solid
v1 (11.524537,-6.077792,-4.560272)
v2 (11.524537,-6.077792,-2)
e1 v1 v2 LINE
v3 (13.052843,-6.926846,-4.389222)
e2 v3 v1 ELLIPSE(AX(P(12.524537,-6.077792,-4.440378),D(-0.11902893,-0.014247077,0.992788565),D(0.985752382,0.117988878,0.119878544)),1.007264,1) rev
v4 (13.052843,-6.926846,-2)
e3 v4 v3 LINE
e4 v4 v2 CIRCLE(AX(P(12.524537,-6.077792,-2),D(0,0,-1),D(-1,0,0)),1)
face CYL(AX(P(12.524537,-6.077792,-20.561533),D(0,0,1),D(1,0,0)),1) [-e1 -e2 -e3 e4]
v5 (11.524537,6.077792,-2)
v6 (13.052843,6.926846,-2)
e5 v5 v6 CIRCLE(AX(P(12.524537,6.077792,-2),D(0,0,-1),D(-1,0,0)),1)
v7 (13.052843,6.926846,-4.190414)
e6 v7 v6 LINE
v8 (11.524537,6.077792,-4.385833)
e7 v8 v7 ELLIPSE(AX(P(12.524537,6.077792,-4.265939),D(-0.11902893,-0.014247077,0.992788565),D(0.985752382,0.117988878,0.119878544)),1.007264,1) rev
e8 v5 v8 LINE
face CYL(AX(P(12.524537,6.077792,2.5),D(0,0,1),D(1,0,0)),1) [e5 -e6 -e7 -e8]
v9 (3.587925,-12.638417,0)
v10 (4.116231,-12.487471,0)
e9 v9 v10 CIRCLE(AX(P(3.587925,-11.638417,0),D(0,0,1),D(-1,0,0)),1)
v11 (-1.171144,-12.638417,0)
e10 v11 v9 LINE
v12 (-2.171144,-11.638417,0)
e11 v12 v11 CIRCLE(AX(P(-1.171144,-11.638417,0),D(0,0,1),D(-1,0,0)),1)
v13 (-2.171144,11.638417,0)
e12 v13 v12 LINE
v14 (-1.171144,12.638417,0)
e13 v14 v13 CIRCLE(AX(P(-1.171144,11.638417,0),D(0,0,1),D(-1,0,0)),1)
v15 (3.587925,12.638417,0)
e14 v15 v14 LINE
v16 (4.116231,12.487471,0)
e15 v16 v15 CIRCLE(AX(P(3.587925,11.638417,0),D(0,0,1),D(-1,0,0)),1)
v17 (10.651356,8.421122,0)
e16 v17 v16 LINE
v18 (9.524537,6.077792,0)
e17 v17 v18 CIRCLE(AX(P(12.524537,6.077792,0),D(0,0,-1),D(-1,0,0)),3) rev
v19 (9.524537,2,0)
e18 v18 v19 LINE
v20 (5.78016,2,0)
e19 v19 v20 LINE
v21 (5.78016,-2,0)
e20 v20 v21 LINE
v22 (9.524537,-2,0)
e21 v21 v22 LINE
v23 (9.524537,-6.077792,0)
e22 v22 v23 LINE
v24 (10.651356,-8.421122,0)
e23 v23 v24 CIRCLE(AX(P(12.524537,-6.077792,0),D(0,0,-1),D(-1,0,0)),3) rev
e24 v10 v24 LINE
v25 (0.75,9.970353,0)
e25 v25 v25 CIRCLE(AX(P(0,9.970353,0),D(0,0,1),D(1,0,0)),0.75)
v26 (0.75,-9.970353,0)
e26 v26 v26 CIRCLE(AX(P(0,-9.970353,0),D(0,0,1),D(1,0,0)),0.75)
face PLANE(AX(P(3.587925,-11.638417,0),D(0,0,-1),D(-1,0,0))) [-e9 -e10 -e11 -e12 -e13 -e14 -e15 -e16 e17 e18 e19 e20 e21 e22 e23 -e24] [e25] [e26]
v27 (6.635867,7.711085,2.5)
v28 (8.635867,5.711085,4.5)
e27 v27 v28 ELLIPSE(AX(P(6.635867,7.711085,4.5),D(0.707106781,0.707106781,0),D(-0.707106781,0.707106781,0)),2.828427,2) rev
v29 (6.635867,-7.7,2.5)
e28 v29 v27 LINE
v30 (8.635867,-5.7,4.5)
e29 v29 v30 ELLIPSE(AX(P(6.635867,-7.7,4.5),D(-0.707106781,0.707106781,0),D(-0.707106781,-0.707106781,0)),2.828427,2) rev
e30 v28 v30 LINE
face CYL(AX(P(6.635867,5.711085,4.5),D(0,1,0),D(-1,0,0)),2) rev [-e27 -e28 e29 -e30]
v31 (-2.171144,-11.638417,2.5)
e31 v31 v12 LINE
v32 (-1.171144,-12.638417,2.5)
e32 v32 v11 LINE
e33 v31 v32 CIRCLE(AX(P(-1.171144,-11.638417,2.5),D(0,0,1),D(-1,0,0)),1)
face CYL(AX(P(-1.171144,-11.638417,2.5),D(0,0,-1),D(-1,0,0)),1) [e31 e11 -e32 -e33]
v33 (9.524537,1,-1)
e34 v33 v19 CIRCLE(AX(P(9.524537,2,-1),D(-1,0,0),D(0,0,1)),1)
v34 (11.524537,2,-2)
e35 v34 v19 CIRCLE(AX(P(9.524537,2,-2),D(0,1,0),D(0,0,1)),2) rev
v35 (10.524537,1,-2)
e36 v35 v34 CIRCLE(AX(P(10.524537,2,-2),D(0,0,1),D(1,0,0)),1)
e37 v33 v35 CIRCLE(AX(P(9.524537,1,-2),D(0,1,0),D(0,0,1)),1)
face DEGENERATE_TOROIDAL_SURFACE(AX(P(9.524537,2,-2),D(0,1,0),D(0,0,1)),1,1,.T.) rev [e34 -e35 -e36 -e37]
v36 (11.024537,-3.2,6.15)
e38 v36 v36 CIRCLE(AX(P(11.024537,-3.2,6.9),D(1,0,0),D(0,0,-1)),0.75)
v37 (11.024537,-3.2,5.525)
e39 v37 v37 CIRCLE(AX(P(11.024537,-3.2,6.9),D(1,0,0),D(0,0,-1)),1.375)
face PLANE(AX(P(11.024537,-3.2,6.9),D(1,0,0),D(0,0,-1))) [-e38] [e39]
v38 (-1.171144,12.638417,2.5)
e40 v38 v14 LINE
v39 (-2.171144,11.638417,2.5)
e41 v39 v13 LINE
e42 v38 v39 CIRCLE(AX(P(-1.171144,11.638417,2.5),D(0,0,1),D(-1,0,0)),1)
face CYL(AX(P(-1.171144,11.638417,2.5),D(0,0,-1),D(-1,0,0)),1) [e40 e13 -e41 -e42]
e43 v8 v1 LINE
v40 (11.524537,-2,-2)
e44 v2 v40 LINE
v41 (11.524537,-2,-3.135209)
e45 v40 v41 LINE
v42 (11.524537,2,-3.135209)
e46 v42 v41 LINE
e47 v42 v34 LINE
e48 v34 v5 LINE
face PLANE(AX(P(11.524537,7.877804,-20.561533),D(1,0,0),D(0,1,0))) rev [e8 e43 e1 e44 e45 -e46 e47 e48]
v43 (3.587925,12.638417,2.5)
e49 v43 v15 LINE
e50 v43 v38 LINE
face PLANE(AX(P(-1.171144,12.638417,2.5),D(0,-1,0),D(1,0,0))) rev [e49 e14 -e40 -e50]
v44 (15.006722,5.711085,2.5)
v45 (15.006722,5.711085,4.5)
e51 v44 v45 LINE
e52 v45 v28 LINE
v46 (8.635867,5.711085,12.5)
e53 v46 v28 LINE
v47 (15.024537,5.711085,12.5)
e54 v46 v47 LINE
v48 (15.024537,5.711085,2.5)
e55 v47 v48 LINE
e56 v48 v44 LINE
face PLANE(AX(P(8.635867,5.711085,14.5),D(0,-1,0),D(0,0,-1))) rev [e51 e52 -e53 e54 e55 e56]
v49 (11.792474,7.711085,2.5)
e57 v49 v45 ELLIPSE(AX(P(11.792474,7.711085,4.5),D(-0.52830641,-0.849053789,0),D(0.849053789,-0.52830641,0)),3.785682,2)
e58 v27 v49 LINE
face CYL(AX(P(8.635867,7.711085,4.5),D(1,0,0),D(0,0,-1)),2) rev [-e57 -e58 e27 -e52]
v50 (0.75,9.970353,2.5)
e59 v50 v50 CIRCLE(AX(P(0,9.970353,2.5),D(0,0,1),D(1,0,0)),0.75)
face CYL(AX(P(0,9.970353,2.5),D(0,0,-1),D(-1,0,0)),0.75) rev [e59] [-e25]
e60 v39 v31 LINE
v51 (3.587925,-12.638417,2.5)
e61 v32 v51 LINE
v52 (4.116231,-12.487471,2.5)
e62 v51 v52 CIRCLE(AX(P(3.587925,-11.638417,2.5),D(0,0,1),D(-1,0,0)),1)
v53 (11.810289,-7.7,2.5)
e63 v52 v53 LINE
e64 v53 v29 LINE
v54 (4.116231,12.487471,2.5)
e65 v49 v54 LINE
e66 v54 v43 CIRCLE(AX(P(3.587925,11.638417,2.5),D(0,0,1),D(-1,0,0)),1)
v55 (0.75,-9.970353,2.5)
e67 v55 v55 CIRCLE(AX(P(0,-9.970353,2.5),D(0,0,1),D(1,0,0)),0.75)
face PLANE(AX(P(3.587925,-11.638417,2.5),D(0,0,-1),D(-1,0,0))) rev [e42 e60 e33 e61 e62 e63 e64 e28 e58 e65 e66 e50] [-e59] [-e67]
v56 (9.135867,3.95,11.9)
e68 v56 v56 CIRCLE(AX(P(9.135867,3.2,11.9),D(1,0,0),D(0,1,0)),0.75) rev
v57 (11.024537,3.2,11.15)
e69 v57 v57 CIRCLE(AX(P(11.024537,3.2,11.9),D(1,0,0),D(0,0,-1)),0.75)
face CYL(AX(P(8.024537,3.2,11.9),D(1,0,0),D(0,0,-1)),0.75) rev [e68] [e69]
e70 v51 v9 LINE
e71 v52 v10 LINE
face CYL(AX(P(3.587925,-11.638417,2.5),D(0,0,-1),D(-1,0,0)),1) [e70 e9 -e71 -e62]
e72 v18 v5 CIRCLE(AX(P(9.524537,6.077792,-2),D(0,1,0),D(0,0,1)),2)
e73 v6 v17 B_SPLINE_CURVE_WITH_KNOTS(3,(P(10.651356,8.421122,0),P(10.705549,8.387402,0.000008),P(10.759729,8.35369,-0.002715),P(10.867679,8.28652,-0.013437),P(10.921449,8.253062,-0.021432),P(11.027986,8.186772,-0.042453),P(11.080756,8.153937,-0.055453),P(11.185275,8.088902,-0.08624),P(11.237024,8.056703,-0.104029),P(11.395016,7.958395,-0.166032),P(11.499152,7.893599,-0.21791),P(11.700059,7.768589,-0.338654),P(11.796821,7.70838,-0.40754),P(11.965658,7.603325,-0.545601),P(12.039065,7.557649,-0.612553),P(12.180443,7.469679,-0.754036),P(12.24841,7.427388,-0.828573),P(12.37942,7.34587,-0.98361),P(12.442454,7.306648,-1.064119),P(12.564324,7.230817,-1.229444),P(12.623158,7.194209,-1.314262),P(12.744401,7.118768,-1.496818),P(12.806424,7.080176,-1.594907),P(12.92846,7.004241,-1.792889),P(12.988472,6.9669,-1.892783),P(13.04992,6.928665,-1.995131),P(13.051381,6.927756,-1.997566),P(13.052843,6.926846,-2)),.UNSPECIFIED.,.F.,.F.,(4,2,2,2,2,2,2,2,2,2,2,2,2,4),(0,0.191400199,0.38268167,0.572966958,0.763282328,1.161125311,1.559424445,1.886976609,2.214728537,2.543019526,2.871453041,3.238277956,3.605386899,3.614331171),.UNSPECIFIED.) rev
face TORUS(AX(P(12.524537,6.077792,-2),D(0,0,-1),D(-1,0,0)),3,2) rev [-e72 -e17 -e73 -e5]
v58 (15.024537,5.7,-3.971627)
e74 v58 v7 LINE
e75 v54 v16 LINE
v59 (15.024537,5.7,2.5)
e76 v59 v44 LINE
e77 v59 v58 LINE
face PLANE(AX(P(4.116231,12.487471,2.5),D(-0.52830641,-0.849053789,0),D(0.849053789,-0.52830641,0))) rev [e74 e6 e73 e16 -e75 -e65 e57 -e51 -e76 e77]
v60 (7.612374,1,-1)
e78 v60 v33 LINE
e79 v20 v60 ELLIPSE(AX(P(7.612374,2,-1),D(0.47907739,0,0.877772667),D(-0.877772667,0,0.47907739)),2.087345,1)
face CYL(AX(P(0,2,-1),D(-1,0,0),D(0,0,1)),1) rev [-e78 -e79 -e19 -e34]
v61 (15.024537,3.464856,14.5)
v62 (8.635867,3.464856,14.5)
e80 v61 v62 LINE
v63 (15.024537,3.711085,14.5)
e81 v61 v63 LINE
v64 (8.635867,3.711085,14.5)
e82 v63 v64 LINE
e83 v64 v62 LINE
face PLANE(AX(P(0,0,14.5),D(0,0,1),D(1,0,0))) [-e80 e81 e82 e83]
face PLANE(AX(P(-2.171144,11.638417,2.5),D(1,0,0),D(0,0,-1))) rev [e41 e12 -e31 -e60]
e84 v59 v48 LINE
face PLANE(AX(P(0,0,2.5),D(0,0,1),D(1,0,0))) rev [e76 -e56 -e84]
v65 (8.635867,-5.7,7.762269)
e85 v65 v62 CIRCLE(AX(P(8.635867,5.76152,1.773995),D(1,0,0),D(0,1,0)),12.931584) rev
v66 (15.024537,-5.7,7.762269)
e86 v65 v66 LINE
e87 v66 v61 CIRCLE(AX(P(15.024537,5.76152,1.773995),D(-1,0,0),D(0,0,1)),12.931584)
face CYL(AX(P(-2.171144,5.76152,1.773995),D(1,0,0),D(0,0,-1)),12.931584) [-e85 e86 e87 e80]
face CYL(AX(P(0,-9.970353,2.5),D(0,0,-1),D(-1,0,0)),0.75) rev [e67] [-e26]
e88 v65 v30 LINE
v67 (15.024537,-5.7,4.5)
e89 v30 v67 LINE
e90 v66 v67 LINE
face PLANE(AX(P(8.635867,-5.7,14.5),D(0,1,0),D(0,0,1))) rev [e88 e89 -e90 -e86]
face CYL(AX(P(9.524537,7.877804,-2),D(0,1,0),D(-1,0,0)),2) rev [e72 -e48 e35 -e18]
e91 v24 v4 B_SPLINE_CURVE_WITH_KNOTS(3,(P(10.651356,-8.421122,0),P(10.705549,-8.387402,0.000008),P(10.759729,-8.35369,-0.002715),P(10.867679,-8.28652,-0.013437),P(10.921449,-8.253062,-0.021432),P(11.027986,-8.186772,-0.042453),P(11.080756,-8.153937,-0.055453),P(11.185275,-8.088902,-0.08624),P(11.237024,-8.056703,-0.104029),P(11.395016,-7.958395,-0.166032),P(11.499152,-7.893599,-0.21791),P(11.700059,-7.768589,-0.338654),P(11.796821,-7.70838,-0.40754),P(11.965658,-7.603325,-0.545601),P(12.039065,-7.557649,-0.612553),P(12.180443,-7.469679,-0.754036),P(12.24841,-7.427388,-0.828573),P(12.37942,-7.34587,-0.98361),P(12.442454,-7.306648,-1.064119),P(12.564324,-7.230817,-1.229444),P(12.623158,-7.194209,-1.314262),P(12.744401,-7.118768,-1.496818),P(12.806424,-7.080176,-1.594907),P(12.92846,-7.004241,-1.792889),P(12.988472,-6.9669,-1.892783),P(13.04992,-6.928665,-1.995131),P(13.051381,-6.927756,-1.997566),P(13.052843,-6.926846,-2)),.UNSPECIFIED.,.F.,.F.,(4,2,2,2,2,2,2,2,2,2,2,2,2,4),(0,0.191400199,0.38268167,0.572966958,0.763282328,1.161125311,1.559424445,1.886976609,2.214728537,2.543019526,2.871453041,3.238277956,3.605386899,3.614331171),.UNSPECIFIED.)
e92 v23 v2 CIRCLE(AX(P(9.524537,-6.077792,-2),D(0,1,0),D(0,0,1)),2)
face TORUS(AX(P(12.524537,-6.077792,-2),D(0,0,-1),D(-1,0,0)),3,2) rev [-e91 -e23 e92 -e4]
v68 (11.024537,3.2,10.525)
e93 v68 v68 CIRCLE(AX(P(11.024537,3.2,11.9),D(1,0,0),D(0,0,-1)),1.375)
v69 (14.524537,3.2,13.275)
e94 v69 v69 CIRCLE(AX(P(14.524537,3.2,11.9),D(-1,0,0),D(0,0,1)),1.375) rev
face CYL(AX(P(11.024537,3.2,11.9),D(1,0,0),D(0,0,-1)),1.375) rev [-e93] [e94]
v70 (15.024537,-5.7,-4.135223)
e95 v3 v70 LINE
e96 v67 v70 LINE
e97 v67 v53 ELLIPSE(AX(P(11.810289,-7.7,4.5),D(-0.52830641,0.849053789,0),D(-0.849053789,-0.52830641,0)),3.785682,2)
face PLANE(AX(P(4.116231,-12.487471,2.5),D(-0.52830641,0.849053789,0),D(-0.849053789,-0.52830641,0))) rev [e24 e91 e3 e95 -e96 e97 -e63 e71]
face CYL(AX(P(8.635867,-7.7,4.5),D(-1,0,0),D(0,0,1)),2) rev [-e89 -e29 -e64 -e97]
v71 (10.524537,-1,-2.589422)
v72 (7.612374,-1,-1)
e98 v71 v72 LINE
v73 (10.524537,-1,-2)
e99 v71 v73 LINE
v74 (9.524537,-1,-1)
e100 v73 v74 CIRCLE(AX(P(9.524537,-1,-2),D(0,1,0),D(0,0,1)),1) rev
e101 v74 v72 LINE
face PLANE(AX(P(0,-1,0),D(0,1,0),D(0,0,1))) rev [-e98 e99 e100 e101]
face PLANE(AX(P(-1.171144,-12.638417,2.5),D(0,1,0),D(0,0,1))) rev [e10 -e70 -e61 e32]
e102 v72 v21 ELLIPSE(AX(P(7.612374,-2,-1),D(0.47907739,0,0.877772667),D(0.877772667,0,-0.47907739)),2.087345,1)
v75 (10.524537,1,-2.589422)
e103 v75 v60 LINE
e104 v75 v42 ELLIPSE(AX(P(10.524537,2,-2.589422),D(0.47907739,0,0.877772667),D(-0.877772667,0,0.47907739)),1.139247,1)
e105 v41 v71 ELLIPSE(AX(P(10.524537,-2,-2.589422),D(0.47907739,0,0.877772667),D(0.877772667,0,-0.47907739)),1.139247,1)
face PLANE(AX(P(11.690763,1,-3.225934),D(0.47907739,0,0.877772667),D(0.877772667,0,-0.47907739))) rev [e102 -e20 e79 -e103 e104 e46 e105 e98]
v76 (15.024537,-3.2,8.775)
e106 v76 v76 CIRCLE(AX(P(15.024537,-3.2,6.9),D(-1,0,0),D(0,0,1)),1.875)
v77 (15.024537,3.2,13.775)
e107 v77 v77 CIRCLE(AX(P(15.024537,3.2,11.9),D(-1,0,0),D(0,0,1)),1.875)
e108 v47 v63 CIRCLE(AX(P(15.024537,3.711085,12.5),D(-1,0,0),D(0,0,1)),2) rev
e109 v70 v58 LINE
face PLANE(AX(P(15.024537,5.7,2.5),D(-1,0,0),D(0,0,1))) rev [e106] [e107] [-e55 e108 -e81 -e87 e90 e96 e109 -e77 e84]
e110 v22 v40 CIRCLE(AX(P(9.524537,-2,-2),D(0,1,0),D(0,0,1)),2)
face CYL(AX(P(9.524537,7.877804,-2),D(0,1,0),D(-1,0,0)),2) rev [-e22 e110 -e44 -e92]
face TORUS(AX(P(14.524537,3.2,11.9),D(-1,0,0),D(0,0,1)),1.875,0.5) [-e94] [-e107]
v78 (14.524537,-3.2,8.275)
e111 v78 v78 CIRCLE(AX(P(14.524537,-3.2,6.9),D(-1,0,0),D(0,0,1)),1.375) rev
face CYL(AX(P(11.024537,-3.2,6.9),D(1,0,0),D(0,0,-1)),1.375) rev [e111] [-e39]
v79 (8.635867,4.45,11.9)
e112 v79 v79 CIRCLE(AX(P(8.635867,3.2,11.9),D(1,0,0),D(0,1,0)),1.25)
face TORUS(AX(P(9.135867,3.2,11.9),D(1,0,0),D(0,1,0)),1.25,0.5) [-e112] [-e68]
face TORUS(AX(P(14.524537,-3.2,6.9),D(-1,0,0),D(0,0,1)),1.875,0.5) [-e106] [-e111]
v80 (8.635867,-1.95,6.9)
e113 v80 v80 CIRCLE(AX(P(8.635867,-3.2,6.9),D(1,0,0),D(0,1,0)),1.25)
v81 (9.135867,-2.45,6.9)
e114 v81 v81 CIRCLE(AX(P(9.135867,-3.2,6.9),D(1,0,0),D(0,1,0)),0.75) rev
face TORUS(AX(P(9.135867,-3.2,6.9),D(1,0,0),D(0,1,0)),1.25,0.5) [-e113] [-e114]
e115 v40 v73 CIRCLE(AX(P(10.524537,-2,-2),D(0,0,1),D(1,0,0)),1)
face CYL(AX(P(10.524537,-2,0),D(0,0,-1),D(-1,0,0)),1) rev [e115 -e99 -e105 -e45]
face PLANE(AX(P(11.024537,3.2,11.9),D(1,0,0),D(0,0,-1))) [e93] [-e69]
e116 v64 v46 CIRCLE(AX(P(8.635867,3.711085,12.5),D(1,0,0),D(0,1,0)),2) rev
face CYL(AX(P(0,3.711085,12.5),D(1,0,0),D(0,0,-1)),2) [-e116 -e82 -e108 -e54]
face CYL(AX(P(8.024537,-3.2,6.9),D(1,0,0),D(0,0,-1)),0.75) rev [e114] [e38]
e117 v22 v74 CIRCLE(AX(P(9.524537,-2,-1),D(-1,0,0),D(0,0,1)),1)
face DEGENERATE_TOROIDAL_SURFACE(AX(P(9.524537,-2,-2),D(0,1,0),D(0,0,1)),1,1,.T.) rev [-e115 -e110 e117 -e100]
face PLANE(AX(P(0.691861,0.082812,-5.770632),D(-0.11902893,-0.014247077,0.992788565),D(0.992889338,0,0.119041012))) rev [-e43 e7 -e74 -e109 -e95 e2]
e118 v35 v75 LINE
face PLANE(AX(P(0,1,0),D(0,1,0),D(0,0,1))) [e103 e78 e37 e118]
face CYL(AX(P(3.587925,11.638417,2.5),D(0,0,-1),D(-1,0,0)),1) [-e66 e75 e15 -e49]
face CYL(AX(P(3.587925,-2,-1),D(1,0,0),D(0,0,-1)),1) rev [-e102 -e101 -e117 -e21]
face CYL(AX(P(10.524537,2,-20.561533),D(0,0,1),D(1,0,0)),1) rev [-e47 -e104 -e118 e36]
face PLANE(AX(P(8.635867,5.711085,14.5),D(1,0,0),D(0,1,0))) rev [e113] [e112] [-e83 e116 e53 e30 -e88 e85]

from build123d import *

# Parameters (mm, degrees)
SKETCH2_R           = 0.7500000000000004
BOSS_EXTRUDE1_DEPTH = 2.5
BOSS_EXTRUDE2_DEPTH = 12
CUT_EXTRUDE1_DEPTH  = 26.80060102058964
SKETCH6_R           = 1.3749999999999991
CUT_EXTRUDE2_DEPTH  = 4
SKETCH7_R           = 0.7500000000000003
CUT_EXTRUDE3_DEPTH  = 3
FILLET1_R           = 2
BOSS_EXTRUDE3_REACH = 26.407
FILLET2_R           = 1
FILLET3_R           = 2
FILLET4_R           = 0.5
FILLET5_R           = 2
BOSS_EXTRUDE4_DEPTH = 1
FILLET6_R           = 1


with BuildPart() as part:
    # Sketch2 → Boss-Extrude1 (new body)
    with BuildSketch(Plane.XY):
        with BuildLine():
            Line((4.116231300669973, -12.487470539218611), (15.02453653918129, -5.7))
            Line((15.02453653918129, -5.7), (15.02453653918129, 5.7))
            Line((15.02453653918129, 5.7), (4.116231300669971, 12.48747053921861))
            ThreePointArc((4.116231300669971, 12.48747053921861), (3.862648579708159, 12.599939965816992), (3.587924890573724, 12.638416749961875))
            Line((3.587924890573724, 12.638416749961875), (-1.1711441707508923, 12.638416749961877))
            ThreePointArc((-1.1711441707508923, 12.638416749961877), (-1.8782509519374466, 12.345523531148423), (-2.1711441707508996, 11.63841674996187))
            Line((-2.1711441707508996, 11.63841674996187), (-2.1711441707508996, -11.638416749961872))
            ThreePointArc((-2.1711441707508996, -11.638416749961872), (-1.8782509519374468, -12.345523531148427), (-1.1711441707508923, -12.638416749961879))
            Line((-1.1711441707508923, -12.638416749961879), (3.5879248905737255, -12.638416749961879))
            ThreePointArc((3.5879248905737255, -12.638416749961879), (3.862648579708161, -12.599939965816995), (4.116231300669973, -12.487470539218611))
        make_face()
        with Locations((0, -9.97035341926017)):
            Circle(SKETCH2_R, mode=Mode.SUBTRACT)
        with Locations((3.47e-15, 9.97035341926017)):
            Circle(SKETCH2_R, mode=Mode.SUBTRACT)
    extrude(amount=BOSS_EXTRUDE1_DEPTH)

    # Sketch3 → Boss-Extrude2 (add)
    with BuildSketch(Plane.XY.offset(2.5)):
        Polygon((8.635867339785385, 5.711084969162394), (15.02453653918129, 5.711084969162394), (15.02453653918129, -5.7), (8.635867339785387, -5.7), align=None)
    extrude(amount=BOSS_EXTRUDE2_DEPTH)

    # Sketch5 → Cut-Extrude1 (cut, through all)
    with BuildSketch(Plane(origin=(15.02453653918129, 0, 0), x_dir=(0, 0, -1), z_dir=(1, 0, 0))):
        with BuildLine():
            Line((-7.762268701086982, -5.7), (-14.5, -5.7))
            Line((-14.5, -5.7), (-14.5, 3.4648563911354757))
            ThreePointArc((-14.5, 3.4648563911354757), (-12.192953898035139, -1.8981901244151027), (-7.762268701086982, -5.7))
        make_face()
    extrude(amount=-CUT_EXTRUDE1_DEPTH, mode=Mode.SUBTRACT)

    # Sketch6 → Cut-Extrude2 (cut)
    with BuildSketch(Plane(origin=(15.02453653918129, 0, 0), x_dir=(0, 0, -1), z_dir=(1, 0, 0))):
        with Locations((-6.900000000000064, -3.2)):
            Circle(SKETCH6_R)
        with Locations((-11.900000000000077, 3.2)):
            Circle(SKETCH6_R)
    extrude(amount=-CUT_EXTRUDE2_DEPTH, mode=Mode.SUBTRACT)

    # Sketch7 → Cut-Extrude3 (cut)
    with BuildSketch(Plane(origin=(11.02453653918129, 0, 0), x_dir=(0, 0, -1), z_dir=(1, 0, 0))):
        with Locations((-11.900000000000077, 3.2)):
            Circle(SKETCH7_R)
        with Locations((-6.900000000000064, -3.2)):
            Circle(SKETCH7_R)
    extrude(amount=-CUT_EXTRUDE3_DEPTH, mode=Mode.SUBTRACT)

    # Fillet1
    fillet1_edges = [part.edges().sort_by_distance(p)[0] for p in [
        (11.821294480770684, 5.711084969162394, 2.5),
        (8.635867339785385, 0.00554248458119755, 2.5),
        (11.830201939483338, -5.7, 2.5),
    ]]
    fillet(fillet1_edges, radius=FILLET1_R)

    # Boss-Extrude3: up to this plane
    boss_extrude3_end = Plane(origin=(0.6918614114138348, 0.08281182310567678, -5.770631561455755), z_dir=(-0.11902892958542202, -0.014247076796988894, 0.99278856496461))
    # Sketch8 → Boss-Extrude3 (add, up to the surface)
    with BuildSketch(Plane(origin=(0, 0, 0), x_dir=(-1, 0, 0), z_dir=(0, 0, -1)), mode=Mode.PRIVATE) as boss_extrude3_sk1:
        Polygon((-11.52453653918129, 7.877803642988929), (-11.524536539181288, -7.877803642988929), (-15.02453653918129, -5.7), (-15.02453653918129, 5.7), align=None)
    boss_extrude3_tool1 = split(extrude(boss_extrude3_sk1.sketch, amount=BOSS_EXTRUDE3_REACH, mode=Mode.PRIVATE), bisect_by=boss_extrude3_end, keep=Keep.BOTH, mode=Mode.PRIVATE)
    add(boss_extrude3_tool1.solids().sort_by_distance((13.180973, 0, 0))[0])

    # Fillet2
    fillet2_edges = [part.edges().sort_by_distance(p)[0] for p in [
        (11.524536539181288, -7.877803642988929, -2.293051593463615),
        (11.52453653918129, 7.877803642988929, -2.1800006605116793),
    ]]
    fillet(fillet2_edges, radius=FILLET2_R)

    # Fillet3
    # the kernel refuses this fillet: 2 mm, written as the material it adds along each edge
    with BuildSketch(Plane(origin=(11.52453653918129, 6.077792348729071, 0), x_dir=(0, 0, -1), z_dir=(-1.1e-16, -1, 0))) as fillet3_piece_1:
        with BuildLine():
            CenterArc((FILLET3_R, -FILLET3_R), FILLET3_R, 90, 90)
            Line((-2.2e-16, -FILLET3_R), (0, 0))
            Line((0, 0), (FILLET3_R, 0))
        make_face()
    extrude(amount=12.155584697458142)
    with BuildSketch(Plane(origin=(12.524536539181288, 6.077792348729071, 0), x_dir=(-0.9999802608561372, -0.0062831439655592885, 0), z_dir=(-0.0062831439655592885, 0.9999802608561372, 0))) as fillet3_piece_2_section:
        with BuildLine():
            CenterArc((-1.0000000000000004 - FILLET3_R, -FILLET3_R), FILLET3_R, 0, 90)
            Line((-1.0000000000000004 - FILLET3_R, 2.2e-16), (-1.0000000000000004, 0))
            Line((-1.0000000000000004, 0), (-1.0000000000000004, -FILLET3_R))
        make_face()
    fillet3_piece_2 = revolve(axis=Axis((12.524536539181288, 6.077792348729071, 0), (0, 0, 1)), revolution_arc=359.64, mode=Mode.PRIVATE)
    fillet3_piece_2 = split(fillet3_piece_2, bisect_by=Plane(origin=(15.02453653918129, 7.1019861013756325, -0.5901681133498685), z_dir=(-1, 0, 0)), keep=Keep.TOP, mode=Mode.PRIVATE)
    fillet3_piece_2 = split(fillet3_piece_2, bisect_by=Plane(origin=(12.183247296711823, 7.467934303724357, -0.5901681133498685), z_dir=(-0.5283064100962469, -0.8490537892567327, 0)), keep=Keep.TOP, mode=Mode.PRIVATE)
    add(fillet3_piece_2)
    with BuildSketch(Plane(origin=(12.524536539181288, -6.077792348729071, 0), x_dir=(-0.9999802608561372, 0.0062831439655592885, 0), z_dir=(-0.0062831439655592885, -0.9999802608561372, 0))) as fillet3_piece_3_section:
        with BuildLine():
            CenterArc((-1.0000000000000004 - FILLET3_R, FILLET3_R), FILLET3_R, 270, 89.99999999999999)
            Line((-1.0000000000000004, FILLET3_R), (-1.0000000000000004, 0))
            Line((-1.0000000000000004, 0), (-1.0000000000000004 - FILLET3_R, 0))
        make_face()
    fillet3_piece_3 = revolve(axis=Axis((12.524536539181288, -6.077792348729071, 0), (0, 0, -1)), revolution_arc=359.64, mode=Mode.PRIVATE)
    fillet3_piece_3 = split(fillet3_piece_3, bisect_by=Plane(origin=(12.183247362657765, -7.46793426269084, -0.5901681133823713), z_dir=(-0.528306410096247, 0.8490537892567326, 0)), keep=Keep.TOP, mode=Mode.PRIVATE)
    fillet3_piece_3 = split(fillet3_piece_3, bisect_by=Plane(origin=(15.02453653918129, -7.101986179070657, -0.5901681133823713), z_dir=(-1, 0, 0)), keep=Keep.TOP, mode=Mode.PRIVATE)
    add(fillet3_piece_3)

    # Fillet4
    fillet4_edges = [part.edges().sort_by_distance(p)[0] for p in [
        (15.02453653918129, -3.1999999999999993, 8.275000000000063),
        (15.02453653918129, 3.200000000000001, 13.275000000000077),
        (8.635867339785387, 3.2, 12.650000000000077),
        (8.635867339785387, -3.2, 7.650000000000064),
    ]]
    fillet(fillet4_edges, radius=FILLET4_R)

    # Fillet5
    fillet5_edges = [part.edges().sort_by_distance(p)[0] for p in [
        (11.830201939483338, 5.711084969162394, 14.5),
    ]]
    fillet(fillet5_edges, radius=FILLET5_R)

    # Sketch9 → Boss-Extrude4 (add, symmetric)
    with BuildSketch(Plane(origin=(0, 0, 0), x_dir=(1, 0, 0), z_dir=(0, 1, 0))):
        Polygon((13.64406676847059, 3.2259337507926826), (11.690763161789368, 3.2259337507926826), (5.025114603989698, -0.41209421665109464), (13.155740866800285, -0.41209421665109464), align=None)
    extrude(amount=BOSS_EXTRUDE4_DEPTH, both=True)

    # Fillet6
    fillet6_edges = [part.edges().sort_by_distance(p)[0] for p in [
        (10.938750101554096, -1, -0.5857864376269046),
        (10.938750101554096, 1, -0.5857864376269046),
        (11.524536539181288, 1, -2.5676046651974334),
        (7.652348125765714, -1, 0),
        (7.652348125765714, 1, 0),
        (11.524536539181288, -1.0000000000000004, -2.567604665197433),
    ]]
    fillet(fillet6_edges, radius=FILLET6_R)


solid = part.part
